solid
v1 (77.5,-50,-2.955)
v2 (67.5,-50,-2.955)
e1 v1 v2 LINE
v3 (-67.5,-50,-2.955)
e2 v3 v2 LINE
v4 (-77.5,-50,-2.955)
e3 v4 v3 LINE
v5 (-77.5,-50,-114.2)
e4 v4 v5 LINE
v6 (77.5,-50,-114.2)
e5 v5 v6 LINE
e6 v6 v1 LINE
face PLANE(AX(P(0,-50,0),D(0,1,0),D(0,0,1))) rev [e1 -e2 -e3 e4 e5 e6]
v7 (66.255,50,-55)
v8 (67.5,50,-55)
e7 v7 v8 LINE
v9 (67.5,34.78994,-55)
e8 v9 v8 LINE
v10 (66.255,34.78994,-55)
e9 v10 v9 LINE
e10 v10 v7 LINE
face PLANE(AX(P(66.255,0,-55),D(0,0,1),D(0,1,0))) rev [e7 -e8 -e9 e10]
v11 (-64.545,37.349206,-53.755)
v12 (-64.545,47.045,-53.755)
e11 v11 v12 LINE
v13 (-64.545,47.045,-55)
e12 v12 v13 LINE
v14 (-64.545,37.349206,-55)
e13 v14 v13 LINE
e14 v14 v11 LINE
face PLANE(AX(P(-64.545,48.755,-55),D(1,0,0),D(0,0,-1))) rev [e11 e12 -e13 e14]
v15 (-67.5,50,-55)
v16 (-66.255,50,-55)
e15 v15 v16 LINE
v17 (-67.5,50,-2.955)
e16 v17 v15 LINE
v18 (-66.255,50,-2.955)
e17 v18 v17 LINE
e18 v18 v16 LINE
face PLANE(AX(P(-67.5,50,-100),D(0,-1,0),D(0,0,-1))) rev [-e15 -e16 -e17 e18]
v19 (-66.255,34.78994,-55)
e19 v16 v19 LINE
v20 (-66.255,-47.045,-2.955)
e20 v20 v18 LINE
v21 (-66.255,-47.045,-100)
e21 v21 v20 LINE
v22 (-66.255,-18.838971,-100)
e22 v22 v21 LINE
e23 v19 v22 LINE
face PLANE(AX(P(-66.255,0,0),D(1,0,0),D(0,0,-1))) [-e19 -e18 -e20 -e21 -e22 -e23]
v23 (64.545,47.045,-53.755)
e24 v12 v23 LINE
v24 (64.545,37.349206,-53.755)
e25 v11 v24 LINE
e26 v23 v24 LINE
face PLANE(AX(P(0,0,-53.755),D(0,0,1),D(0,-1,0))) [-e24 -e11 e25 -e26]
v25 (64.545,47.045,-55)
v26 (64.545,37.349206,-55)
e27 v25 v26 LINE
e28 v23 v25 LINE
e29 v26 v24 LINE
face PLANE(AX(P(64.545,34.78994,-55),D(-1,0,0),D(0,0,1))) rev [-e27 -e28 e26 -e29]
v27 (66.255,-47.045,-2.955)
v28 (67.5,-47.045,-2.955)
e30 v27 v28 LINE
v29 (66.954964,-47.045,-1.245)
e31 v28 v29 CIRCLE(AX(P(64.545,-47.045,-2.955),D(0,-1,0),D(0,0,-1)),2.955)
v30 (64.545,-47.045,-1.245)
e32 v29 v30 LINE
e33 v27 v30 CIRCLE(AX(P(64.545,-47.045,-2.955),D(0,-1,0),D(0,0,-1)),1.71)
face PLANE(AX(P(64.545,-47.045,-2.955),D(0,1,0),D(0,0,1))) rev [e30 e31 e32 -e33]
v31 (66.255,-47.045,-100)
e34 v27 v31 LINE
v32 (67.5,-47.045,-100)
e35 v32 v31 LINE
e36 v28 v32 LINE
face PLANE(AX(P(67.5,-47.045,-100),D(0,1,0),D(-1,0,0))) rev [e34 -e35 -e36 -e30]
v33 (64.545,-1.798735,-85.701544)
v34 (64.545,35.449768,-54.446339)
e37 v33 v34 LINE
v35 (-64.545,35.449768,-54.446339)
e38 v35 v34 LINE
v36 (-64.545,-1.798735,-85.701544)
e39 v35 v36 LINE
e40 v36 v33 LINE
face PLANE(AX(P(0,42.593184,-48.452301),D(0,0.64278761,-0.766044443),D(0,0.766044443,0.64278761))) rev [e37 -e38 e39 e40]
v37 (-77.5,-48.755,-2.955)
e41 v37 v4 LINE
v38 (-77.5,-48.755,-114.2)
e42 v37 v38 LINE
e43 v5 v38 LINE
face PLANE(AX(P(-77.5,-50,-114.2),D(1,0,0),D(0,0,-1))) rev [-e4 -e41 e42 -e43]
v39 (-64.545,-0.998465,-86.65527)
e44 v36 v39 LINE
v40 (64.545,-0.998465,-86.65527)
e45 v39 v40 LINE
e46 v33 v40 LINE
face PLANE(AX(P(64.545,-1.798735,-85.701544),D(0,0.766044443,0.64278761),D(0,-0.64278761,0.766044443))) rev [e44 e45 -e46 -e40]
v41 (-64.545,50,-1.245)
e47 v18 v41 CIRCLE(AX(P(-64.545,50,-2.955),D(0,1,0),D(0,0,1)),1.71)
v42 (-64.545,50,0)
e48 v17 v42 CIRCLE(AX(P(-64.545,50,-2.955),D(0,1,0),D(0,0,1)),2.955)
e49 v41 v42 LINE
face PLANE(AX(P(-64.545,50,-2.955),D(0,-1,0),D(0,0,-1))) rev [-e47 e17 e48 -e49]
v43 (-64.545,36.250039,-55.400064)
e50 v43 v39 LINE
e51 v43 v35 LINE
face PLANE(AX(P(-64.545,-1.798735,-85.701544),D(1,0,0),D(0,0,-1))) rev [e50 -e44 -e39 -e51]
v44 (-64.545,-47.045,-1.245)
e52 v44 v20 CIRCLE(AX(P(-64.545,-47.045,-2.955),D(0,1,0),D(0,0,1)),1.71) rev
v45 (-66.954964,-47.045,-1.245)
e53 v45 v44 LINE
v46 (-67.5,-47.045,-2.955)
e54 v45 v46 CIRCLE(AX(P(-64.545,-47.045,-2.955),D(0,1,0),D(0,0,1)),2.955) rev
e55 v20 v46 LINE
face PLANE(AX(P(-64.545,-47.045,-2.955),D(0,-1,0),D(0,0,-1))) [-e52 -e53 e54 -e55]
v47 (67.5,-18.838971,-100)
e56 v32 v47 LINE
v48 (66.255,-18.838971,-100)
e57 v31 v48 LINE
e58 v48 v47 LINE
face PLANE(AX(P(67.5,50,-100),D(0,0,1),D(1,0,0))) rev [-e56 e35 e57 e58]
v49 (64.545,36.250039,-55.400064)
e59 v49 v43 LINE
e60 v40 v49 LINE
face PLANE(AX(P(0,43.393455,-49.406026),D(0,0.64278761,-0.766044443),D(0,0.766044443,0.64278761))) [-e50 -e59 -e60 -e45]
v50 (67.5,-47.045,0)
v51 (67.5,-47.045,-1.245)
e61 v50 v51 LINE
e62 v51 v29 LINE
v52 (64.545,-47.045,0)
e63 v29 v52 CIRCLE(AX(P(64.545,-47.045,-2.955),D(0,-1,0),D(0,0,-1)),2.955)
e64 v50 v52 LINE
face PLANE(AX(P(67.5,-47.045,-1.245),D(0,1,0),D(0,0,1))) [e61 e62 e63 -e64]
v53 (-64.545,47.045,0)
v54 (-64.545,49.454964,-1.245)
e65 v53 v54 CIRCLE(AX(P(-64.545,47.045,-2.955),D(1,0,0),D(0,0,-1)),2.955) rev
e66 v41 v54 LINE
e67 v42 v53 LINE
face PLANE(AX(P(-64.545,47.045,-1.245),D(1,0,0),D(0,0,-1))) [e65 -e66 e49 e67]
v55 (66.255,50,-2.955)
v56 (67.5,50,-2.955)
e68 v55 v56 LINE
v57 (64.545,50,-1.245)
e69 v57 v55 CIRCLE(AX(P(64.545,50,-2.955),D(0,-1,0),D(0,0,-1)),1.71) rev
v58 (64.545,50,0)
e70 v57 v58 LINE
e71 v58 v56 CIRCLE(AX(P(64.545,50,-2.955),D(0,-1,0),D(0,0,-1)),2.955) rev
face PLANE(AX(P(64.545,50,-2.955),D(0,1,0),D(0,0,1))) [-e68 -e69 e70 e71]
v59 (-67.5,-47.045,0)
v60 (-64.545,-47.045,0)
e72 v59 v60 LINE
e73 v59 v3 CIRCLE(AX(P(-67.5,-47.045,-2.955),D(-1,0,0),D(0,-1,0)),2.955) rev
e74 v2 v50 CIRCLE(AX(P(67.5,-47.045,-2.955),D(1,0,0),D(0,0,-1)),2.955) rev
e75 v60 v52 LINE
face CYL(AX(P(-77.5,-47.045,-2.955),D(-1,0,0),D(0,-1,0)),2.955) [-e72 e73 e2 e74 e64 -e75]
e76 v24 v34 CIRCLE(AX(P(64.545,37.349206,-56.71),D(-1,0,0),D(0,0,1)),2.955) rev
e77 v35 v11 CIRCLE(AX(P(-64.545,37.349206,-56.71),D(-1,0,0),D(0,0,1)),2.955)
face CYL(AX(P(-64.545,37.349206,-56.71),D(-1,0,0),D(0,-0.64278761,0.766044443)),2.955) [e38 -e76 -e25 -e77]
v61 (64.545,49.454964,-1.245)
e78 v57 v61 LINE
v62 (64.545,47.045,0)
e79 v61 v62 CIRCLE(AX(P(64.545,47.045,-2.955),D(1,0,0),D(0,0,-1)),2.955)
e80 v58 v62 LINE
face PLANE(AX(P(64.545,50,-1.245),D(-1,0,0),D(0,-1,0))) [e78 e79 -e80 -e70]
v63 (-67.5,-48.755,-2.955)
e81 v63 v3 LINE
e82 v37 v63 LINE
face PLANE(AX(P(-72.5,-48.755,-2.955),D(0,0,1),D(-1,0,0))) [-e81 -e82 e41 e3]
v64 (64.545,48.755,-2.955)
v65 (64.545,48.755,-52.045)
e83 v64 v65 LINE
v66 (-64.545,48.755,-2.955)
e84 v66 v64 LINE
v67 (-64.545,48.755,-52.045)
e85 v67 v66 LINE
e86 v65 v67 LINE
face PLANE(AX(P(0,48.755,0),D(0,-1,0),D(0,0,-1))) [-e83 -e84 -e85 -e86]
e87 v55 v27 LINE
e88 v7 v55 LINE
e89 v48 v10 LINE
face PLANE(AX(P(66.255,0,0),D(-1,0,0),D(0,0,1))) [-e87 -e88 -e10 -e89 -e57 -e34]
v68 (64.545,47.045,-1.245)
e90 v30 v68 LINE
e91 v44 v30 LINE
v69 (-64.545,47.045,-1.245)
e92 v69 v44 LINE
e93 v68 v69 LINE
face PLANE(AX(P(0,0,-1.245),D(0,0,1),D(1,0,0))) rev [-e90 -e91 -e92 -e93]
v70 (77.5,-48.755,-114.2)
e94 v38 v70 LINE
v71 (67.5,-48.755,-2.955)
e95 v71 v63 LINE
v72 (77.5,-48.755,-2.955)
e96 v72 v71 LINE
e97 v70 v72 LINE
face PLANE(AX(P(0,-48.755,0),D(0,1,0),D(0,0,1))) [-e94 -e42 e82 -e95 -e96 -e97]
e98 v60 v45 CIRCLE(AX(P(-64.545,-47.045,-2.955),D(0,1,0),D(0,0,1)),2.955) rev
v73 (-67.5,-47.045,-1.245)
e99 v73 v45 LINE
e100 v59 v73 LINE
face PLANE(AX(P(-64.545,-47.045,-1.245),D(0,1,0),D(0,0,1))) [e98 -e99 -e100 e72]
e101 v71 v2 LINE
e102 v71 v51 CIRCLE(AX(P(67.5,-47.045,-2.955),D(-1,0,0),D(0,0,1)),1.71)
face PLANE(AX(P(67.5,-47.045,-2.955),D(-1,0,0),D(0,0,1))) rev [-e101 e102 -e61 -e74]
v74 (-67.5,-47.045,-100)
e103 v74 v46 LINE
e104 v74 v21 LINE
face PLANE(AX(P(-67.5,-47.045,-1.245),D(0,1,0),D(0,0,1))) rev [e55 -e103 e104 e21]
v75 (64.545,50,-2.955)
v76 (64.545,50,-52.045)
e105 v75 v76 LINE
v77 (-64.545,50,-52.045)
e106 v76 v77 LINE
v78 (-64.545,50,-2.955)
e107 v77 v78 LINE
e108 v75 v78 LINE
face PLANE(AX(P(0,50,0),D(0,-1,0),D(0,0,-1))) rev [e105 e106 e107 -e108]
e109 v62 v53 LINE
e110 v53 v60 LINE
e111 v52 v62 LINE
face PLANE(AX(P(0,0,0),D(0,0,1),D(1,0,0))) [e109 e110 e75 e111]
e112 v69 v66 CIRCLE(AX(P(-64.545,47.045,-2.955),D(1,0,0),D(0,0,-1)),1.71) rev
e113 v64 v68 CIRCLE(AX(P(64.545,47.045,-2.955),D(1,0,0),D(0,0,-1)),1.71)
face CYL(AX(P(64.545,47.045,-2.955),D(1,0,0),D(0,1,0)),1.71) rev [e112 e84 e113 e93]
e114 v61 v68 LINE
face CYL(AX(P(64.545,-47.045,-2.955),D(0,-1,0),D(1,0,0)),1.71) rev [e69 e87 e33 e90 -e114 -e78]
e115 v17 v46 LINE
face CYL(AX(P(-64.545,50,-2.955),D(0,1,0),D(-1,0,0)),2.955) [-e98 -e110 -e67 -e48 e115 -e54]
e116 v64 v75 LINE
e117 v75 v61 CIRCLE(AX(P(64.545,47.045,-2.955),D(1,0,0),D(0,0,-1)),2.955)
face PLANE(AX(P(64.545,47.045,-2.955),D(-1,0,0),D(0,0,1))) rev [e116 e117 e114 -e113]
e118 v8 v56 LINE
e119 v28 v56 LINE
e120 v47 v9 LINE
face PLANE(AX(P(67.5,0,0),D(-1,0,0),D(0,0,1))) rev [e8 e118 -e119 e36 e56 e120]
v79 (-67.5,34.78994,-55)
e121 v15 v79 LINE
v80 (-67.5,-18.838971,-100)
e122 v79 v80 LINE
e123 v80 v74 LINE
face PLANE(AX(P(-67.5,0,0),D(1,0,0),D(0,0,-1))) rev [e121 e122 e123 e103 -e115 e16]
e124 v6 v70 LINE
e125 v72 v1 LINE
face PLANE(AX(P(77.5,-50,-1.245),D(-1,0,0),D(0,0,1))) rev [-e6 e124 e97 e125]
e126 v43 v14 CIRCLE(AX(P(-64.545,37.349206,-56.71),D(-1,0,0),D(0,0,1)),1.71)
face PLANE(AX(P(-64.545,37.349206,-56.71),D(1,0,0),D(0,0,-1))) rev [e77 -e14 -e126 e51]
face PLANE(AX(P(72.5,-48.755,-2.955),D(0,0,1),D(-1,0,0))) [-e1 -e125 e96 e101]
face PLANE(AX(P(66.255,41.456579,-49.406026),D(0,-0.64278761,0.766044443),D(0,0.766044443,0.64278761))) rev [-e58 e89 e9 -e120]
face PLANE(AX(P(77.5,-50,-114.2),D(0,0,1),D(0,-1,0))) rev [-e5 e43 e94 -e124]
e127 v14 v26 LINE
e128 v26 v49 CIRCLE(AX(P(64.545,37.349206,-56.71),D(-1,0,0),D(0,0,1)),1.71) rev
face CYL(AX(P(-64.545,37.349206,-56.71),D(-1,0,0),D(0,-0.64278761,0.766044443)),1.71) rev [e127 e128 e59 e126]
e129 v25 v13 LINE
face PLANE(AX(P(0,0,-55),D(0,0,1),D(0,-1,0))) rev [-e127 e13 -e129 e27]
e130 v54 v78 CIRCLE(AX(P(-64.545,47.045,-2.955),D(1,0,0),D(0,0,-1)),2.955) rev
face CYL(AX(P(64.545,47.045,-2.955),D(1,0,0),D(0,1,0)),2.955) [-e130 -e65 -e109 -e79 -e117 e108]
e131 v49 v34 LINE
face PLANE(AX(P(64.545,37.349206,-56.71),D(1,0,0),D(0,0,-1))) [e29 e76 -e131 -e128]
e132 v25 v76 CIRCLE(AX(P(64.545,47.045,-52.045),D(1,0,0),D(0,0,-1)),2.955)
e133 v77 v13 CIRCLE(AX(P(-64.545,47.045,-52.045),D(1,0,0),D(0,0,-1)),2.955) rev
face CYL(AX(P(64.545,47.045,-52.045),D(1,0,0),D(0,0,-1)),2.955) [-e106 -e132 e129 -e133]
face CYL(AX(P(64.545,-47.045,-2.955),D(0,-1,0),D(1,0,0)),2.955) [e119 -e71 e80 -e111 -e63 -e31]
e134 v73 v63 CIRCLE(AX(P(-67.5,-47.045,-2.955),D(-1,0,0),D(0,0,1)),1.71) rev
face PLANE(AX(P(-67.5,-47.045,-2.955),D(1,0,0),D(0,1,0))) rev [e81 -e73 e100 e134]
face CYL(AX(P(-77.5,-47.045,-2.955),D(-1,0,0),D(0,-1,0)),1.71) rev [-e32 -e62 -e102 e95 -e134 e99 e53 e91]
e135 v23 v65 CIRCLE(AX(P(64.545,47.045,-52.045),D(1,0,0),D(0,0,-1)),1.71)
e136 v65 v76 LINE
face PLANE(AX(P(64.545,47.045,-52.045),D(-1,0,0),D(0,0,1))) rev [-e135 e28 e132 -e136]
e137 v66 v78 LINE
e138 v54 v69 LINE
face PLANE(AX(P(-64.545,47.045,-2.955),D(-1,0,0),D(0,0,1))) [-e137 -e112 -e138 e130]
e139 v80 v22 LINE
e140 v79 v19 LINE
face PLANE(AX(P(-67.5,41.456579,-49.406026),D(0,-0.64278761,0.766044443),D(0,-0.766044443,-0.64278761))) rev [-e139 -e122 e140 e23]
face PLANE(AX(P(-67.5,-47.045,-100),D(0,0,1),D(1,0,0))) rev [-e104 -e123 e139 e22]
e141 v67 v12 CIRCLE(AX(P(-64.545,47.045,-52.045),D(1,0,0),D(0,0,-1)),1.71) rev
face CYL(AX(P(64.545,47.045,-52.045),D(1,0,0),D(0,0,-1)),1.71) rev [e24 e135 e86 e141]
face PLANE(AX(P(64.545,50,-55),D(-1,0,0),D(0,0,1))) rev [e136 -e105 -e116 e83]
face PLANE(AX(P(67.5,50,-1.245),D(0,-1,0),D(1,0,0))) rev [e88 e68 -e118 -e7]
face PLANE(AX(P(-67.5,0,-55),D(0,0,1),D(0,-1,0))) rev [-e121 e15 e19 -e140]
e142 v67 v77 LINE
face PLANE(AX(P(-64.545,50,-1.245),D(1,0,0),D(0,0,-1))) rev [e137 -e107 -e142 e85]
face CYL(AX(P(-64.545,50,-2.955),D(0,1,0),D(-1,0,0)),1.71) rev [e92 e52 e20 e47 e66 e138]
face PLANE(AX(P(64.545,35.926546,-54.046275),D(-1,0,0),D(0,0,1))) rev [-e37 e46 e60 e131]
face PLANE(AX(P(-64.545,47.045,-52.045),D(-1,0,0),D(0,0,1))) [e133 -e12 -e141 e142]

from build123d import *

# Parameters (mm, degrees)
SKETCH1_W                      = 155
SKETCH1_H                      = 100
BASE_FLANGE2_DEPTH             = 1.245
EDGE_FLANGE3_STRIP_W           = 8.4
EDGE_FLANGE3_STRIP_H           = 1.245
EDGE_FLANGE3_STRIP_CUT_DEPTH   = 155
EDGE_FLANGE3_DEPTH             = 155
CUT_EXTRUDE2_START             = -1.245
CUT_EXTRUDE2_OUTLINE_W         = 10
CUT_EXTRUDE2_OUTLINE_H         = 102
CUT_EXTRUDE2_DEPTH             = 2.955
EDGE_FLANGE4_STRIP_W           = 8.4
EDGE_FLANGE4_STRIP_H           = 1.245
EDGE_FLANGE4_STRIP_CUT_DEPTH   = 97.045
EDGE_FLANGE4_STRIP_2_W         = 8.4
EDGE_FLANGE4_STRIP_2_H         = 1.245
EDGE_FLANGE4_STRIP_CUT_2_DEPTH = 97.045
EDGE_FLANGE4_DEPTH             = 97.045
EDGE_FLANGE4_BEND_DEPTH        = 97.045
EDGE_FLANGE5_STRIP_W           = 8.4
EDGE_FLANGE5_STRIP_H           = 1.245
EDGE_FLANGE5_STRIP_CUT_DEPTH   = 129.09
EDGE_FLANGE5_DEPTH             = 129.09
CUT_EXTRUDE3_DEPTH             = 192.224057064
EDGE_FLANGE6_STRIP_W           = 8.4
EDGE_FLANGE6_STRIP_H           = 1.245
EDGE_FLANGE6_STRIP_CUT_DEPTH   = 129.09
EDGE_FLANGE6_DEPTH             = 129.09
EDGE_FLANGE7_START             = -64.545
EDGE_FLANGE7_DEPTH             = 129.09
EDGE_FLANGE7_2_DEPTH           = 129.09


# Read off the part's stored shape, not the designer's step: Cut-Extrude2, Edge-Flange7
# Sheet-metal steps are written as plain solids
with BuildPart() as part:
    # Sketch1 → Base-Flange2 (new body)
    with BuildSketch(Plane.XY):
        Rectangle(SKETCH1_W, SKETCH1_H)
    extrude(amount=-BASE_FLANGE2_DEPTH)

    # Edge-Flange3 strip (across the edge) → Edge-Flange3 strip cut (cut)
    with BuildSketch(Plane(origin=(77.5, -50, -1.245), x_dir=(0, 1, 0), z_dir=(-1, 0, 0))):
        with Locations((-1.245, -0.6225)):
            Rectangle(EDGE_FLANGE3_STRIP_W, EDGE_FLANGE3_STRIP_H)
    extrude(amount=EDGE_FLANGE3_STRIP_CUT_DEPTH, mode=Mode.SUBTRACT)

    # Edge-Flange3 section (across the edge) → Edge-Flange3 (add)
    with BuildSketch(Plane(origin=(77.5, -50, -1.245), x_dir=(0, 1, 0), z_dir=(-1, 0, 0))):
        with BuildLine():
            Line((0, 1.71), (0, 112.955))
            Line((0, 112.955), (1.245, 112.955))
            Line((1.245, 112.955), (1.245, 1.71))
            ThreePointArc((1.245, 1.71), (1.745847404, 0.500847404), (2.955, 0))
            Line((2.955, 0), (2.955, -1.245))
            ThreePointArc((2.955, -1.245), (0.865499462, -0.379500538), (0, 1.71))
        make_face()
    extrude(amount=EDGE_FLANGE3_DEPTH)

    # Cut-Extrude2 outline → Cut-Extrude2 (cut)
    with BuildSketch(Plane(origin=(0, 0, -1.245), x_dir=(-1, 0, 0), z_dir=(0, 0, -1)).offset(CUT_EXTRUDE2_START)):
        with Locations((72.5, 0)):
            Rectangle(CUT_EXTRUDE2_OUTLINE_W, CUT_EXTRUDE2_OUTLINE_H)
        with Locations((-72.5, 0)):
            Rectangle(CUT_EXTRUDE2_OUTLINE_W, CUT_EXTRUDE2_OUTLINE_H)
    extrude(amount=CUT_EXTRUDE2_DEPTH, mode=Mode.SUBTRACT)

    # Edge-Flange4 strip (across the edge) → Edge-Flange4 strip cut (cut)
    with BuildSketch(Plane(origin=(67.5, 50, -1.245), x_dir=(-1, 0, 0), z_dir=(0, -1, 0))):
        with Locations((-1.245, -0.6225)):
            Rectangle(EDGE_FLANGE4_STRIP_W, EDGE_FLANGE4_STRIP_H)
    extrude(amount=EDGE_FLANGE4_STRIP_CUT_DEPTH, mode=Mode.SUBTRACT)

    # Edge-Flange4 strip 2 (across the edge) → Edge-Flange4 strip cut 2 (cut)
    with BuildSketch(Plane(origin=(-67.5, -47.045, -1.245), x_dir=(1, 0, 0), z_dir=(0, 1, 0))):
        with Locations((-1.245, -0.6225)):
            Rectangle(EDGE_FLANGE4_STRIP_2_W, EDGE_FLANGE4_STRIP_2_H)
    extrude(amount=EDGE_FLANGE4_STRIP_CUT_2_DEPTH, mode=Mode.SUBTRACT)

    # Edge-Flange4 section (across the edge) → Edge-Flange4 (add)
    with BuildSketch(Plane(origin=(67.5, 50, -1.245), x_dir=(-1, 0, 0), z_dir=(0, -1, 0))):
        with BuildLine():
            Line((0, 1.71), (0, 98.755))
            Line((0, 98.755), (1.245, 98.755))
            Line((1.245, 98.755), (1.245, 1.71))
            ThreePointArc((1.245, 1.71), (1.745847404, 0.500847404), (2.955, 0))
            Line((2.955, 0), (2.955, -1.245))
            ThreePointArc((2.955, -1.245), (0.865499462, -0.379500538), (0, 1.71))
        make_face()
    extrude(amount=EDGE_FLANGE4_DEPTH)

    # Edge-Flange4 section 2 (across the edge) → Edge-Flange4 bend (add)
    with BuildSketch(Plane(origin=(-67.5, -47.045, -1.245), x_dir=(1, 0, 0), z_dir=(0, 1, 0))):
        with BuildLine():
            Line((0, 1.71), (0, 98.755))
            Line((0, 98.755), (1.245, 98.755))
            Line((1.245, 98.755), (1.245, 1.71))
            ThreePointArc((1.245, 1.71), (1.745847404, 0.500847404), (2.955, 0))
            Line((2.955, 0), (2.955, -1.245))
            ThreePointArc((2.955, -1.245), (0.865499462, -0.379500538), (0, 1.71))
        make_face()
    extrude(amount=EDGE_FLANGE4_BEND_DEPTH)

    # Edge-Flange5 strip (across the edge) → Edge-Flange5 strip cut (cut)
    with BuildSketch(Plane(origin=(-64.545, 50, -1.245), x_dir=(0, -1, 0), z_dir=(1, 0, 0))):
        with Locations((-1.245, -0.6225)):
            Rectangle(EDGE_FLANGE5_STRIP_W, EDGE_FLANGE5_STRIP_H)
    extrude(amount=EDGE_FLANGE5_STRIP_CUT_DEPTH, mode=Mode.SUBTRACT)

    # Edge-Flange5 section (across the edge) → Edge-Flange5 (add)
    with BuildSketch(Plane(origin=(-64.545, 50, -1.245), x_dir=(0, -1, 0), z_dir=(1, 0, 0))):
        with BuildLine():
            Line((0, 1.71), (0, 53.755))
            Line((0, 53.755), (1.245, 53.755))
            Line((1.245, 53.755), (1.245, 1.71))
            ThreePointArc((1.245, 1.71), (1.745847404, 0.500847404), (2.955, 0))
            Line((2.955, 0), (2.955, -1.245))
            ThreePointArc((2.955, -1.245), (0.865499462, -0.379500538), (0, 1.71))
        make_face()
    extrude(amount=EDGE_FLANGE5_DEPTH)

    # Sketch26 → Cut-Extrude3 (cut, through all)
    with BuildSketch(Plane(origin=(67.5, 0, 0), x_dir=(0, 0, -1), z_dir=(1, 0, 0))):
        Polygon((55, 50), (55, 34.789940387), (100, -18.83897128), (100, 50), align=None)
    extrude(amount=-CUT_EXTRUDE3_DEPTH, mode=Mode.SUBTRACT)

    # Edge-Flange6 strip (across the edge) → Edge-Flange6 strip cut (cut)
    with BuildSketch(Plane(origin=(-64.545, 48.755, -55), x_dir=(0, 0, 1), z_dir=(1, 0, 0))):
        with Locations((-1.245, -0.6225)):
            Rectangle(EDGE_FLANGE6_STRIP_W, EDGE_FLANGE6_STRIP_H)
    extrude(amount=EDGE_FLANGE6_STRIP_CUT_DEPTH, mode=Mode.SUBTRACT)

    # Edge-Flange6 section (across the edge) → Edge-Flange6 (add)
    with BuildSketch(Plane(origin=(-64.545, 48.755, -55), x_dir=(0, 0, 1), z_dir=(1, 0, 0))):
        with BuildLine():
            Line((0, 1.71), (0, 13.965059613))
            Line((0, 13.965059613), (1.245, 13.965059613))
            Line((1.245, 13.965059613), (1.245, 1.71))
            ThreePointArc((1.245, 1.71), (1.745847404, 0.500847404), (2.955, 0))
            Line((2.955, 0), (2.955, -1.245))
            ThreePointArc((2.955, -1.245), (0.865499462, -0.379500538), (0, 1.71))
        make_face()
    extrude(amount=EDGE_FLANGE6_DEPTH)

    # Edge-Flange7 outline → Edge-Flange7 (cut)
    with BuildSketch(Plane.YZ.offset(EDGE_FLANGE7_START)):
        with BuildLine():
            Line((34.789940387, -55), (35.449768265, -54.446338671))
            ThreePointArc((35.449768265, -54.446338671), (36.338536128, -53.933208306), (37.349205652, -53.755))
            Line((37.349205652, -53.755), (34.789940387, -53.755))
            Line((34.789940387, -53.755), (34.789940387, -55))
        make_face()
    extrude(amount=EDGE_FLANGE7_DEPTH, mode=Mode.SUBTRACT)

    # Edge-Flange7 2 outline → Edge-Flange7 2 (add)
    with BuildSketch(Plane.YZ.offset(EDGE_FLANGE7_START)):
        with BuildLine():
            Line((37.349205652, -55), (34.789940387, -55))
            Line((34.789940387, -55), (-1.798735213, -85.701544201))
            Line((-1.798735213, -85.701544201), (-0.998464639, -86.655269533))
            Line((-0.998464639, -86.655269533), (36.250038839, -55.400064002))
            ThreePointArc((36.250038839, -55.400064002), (36.764351207, -55.103125618), (37.349205652, -55))
        make_face()
    extrude(amount=EDGE_FLANGE7_2_DEPTH)


solid = part.part
